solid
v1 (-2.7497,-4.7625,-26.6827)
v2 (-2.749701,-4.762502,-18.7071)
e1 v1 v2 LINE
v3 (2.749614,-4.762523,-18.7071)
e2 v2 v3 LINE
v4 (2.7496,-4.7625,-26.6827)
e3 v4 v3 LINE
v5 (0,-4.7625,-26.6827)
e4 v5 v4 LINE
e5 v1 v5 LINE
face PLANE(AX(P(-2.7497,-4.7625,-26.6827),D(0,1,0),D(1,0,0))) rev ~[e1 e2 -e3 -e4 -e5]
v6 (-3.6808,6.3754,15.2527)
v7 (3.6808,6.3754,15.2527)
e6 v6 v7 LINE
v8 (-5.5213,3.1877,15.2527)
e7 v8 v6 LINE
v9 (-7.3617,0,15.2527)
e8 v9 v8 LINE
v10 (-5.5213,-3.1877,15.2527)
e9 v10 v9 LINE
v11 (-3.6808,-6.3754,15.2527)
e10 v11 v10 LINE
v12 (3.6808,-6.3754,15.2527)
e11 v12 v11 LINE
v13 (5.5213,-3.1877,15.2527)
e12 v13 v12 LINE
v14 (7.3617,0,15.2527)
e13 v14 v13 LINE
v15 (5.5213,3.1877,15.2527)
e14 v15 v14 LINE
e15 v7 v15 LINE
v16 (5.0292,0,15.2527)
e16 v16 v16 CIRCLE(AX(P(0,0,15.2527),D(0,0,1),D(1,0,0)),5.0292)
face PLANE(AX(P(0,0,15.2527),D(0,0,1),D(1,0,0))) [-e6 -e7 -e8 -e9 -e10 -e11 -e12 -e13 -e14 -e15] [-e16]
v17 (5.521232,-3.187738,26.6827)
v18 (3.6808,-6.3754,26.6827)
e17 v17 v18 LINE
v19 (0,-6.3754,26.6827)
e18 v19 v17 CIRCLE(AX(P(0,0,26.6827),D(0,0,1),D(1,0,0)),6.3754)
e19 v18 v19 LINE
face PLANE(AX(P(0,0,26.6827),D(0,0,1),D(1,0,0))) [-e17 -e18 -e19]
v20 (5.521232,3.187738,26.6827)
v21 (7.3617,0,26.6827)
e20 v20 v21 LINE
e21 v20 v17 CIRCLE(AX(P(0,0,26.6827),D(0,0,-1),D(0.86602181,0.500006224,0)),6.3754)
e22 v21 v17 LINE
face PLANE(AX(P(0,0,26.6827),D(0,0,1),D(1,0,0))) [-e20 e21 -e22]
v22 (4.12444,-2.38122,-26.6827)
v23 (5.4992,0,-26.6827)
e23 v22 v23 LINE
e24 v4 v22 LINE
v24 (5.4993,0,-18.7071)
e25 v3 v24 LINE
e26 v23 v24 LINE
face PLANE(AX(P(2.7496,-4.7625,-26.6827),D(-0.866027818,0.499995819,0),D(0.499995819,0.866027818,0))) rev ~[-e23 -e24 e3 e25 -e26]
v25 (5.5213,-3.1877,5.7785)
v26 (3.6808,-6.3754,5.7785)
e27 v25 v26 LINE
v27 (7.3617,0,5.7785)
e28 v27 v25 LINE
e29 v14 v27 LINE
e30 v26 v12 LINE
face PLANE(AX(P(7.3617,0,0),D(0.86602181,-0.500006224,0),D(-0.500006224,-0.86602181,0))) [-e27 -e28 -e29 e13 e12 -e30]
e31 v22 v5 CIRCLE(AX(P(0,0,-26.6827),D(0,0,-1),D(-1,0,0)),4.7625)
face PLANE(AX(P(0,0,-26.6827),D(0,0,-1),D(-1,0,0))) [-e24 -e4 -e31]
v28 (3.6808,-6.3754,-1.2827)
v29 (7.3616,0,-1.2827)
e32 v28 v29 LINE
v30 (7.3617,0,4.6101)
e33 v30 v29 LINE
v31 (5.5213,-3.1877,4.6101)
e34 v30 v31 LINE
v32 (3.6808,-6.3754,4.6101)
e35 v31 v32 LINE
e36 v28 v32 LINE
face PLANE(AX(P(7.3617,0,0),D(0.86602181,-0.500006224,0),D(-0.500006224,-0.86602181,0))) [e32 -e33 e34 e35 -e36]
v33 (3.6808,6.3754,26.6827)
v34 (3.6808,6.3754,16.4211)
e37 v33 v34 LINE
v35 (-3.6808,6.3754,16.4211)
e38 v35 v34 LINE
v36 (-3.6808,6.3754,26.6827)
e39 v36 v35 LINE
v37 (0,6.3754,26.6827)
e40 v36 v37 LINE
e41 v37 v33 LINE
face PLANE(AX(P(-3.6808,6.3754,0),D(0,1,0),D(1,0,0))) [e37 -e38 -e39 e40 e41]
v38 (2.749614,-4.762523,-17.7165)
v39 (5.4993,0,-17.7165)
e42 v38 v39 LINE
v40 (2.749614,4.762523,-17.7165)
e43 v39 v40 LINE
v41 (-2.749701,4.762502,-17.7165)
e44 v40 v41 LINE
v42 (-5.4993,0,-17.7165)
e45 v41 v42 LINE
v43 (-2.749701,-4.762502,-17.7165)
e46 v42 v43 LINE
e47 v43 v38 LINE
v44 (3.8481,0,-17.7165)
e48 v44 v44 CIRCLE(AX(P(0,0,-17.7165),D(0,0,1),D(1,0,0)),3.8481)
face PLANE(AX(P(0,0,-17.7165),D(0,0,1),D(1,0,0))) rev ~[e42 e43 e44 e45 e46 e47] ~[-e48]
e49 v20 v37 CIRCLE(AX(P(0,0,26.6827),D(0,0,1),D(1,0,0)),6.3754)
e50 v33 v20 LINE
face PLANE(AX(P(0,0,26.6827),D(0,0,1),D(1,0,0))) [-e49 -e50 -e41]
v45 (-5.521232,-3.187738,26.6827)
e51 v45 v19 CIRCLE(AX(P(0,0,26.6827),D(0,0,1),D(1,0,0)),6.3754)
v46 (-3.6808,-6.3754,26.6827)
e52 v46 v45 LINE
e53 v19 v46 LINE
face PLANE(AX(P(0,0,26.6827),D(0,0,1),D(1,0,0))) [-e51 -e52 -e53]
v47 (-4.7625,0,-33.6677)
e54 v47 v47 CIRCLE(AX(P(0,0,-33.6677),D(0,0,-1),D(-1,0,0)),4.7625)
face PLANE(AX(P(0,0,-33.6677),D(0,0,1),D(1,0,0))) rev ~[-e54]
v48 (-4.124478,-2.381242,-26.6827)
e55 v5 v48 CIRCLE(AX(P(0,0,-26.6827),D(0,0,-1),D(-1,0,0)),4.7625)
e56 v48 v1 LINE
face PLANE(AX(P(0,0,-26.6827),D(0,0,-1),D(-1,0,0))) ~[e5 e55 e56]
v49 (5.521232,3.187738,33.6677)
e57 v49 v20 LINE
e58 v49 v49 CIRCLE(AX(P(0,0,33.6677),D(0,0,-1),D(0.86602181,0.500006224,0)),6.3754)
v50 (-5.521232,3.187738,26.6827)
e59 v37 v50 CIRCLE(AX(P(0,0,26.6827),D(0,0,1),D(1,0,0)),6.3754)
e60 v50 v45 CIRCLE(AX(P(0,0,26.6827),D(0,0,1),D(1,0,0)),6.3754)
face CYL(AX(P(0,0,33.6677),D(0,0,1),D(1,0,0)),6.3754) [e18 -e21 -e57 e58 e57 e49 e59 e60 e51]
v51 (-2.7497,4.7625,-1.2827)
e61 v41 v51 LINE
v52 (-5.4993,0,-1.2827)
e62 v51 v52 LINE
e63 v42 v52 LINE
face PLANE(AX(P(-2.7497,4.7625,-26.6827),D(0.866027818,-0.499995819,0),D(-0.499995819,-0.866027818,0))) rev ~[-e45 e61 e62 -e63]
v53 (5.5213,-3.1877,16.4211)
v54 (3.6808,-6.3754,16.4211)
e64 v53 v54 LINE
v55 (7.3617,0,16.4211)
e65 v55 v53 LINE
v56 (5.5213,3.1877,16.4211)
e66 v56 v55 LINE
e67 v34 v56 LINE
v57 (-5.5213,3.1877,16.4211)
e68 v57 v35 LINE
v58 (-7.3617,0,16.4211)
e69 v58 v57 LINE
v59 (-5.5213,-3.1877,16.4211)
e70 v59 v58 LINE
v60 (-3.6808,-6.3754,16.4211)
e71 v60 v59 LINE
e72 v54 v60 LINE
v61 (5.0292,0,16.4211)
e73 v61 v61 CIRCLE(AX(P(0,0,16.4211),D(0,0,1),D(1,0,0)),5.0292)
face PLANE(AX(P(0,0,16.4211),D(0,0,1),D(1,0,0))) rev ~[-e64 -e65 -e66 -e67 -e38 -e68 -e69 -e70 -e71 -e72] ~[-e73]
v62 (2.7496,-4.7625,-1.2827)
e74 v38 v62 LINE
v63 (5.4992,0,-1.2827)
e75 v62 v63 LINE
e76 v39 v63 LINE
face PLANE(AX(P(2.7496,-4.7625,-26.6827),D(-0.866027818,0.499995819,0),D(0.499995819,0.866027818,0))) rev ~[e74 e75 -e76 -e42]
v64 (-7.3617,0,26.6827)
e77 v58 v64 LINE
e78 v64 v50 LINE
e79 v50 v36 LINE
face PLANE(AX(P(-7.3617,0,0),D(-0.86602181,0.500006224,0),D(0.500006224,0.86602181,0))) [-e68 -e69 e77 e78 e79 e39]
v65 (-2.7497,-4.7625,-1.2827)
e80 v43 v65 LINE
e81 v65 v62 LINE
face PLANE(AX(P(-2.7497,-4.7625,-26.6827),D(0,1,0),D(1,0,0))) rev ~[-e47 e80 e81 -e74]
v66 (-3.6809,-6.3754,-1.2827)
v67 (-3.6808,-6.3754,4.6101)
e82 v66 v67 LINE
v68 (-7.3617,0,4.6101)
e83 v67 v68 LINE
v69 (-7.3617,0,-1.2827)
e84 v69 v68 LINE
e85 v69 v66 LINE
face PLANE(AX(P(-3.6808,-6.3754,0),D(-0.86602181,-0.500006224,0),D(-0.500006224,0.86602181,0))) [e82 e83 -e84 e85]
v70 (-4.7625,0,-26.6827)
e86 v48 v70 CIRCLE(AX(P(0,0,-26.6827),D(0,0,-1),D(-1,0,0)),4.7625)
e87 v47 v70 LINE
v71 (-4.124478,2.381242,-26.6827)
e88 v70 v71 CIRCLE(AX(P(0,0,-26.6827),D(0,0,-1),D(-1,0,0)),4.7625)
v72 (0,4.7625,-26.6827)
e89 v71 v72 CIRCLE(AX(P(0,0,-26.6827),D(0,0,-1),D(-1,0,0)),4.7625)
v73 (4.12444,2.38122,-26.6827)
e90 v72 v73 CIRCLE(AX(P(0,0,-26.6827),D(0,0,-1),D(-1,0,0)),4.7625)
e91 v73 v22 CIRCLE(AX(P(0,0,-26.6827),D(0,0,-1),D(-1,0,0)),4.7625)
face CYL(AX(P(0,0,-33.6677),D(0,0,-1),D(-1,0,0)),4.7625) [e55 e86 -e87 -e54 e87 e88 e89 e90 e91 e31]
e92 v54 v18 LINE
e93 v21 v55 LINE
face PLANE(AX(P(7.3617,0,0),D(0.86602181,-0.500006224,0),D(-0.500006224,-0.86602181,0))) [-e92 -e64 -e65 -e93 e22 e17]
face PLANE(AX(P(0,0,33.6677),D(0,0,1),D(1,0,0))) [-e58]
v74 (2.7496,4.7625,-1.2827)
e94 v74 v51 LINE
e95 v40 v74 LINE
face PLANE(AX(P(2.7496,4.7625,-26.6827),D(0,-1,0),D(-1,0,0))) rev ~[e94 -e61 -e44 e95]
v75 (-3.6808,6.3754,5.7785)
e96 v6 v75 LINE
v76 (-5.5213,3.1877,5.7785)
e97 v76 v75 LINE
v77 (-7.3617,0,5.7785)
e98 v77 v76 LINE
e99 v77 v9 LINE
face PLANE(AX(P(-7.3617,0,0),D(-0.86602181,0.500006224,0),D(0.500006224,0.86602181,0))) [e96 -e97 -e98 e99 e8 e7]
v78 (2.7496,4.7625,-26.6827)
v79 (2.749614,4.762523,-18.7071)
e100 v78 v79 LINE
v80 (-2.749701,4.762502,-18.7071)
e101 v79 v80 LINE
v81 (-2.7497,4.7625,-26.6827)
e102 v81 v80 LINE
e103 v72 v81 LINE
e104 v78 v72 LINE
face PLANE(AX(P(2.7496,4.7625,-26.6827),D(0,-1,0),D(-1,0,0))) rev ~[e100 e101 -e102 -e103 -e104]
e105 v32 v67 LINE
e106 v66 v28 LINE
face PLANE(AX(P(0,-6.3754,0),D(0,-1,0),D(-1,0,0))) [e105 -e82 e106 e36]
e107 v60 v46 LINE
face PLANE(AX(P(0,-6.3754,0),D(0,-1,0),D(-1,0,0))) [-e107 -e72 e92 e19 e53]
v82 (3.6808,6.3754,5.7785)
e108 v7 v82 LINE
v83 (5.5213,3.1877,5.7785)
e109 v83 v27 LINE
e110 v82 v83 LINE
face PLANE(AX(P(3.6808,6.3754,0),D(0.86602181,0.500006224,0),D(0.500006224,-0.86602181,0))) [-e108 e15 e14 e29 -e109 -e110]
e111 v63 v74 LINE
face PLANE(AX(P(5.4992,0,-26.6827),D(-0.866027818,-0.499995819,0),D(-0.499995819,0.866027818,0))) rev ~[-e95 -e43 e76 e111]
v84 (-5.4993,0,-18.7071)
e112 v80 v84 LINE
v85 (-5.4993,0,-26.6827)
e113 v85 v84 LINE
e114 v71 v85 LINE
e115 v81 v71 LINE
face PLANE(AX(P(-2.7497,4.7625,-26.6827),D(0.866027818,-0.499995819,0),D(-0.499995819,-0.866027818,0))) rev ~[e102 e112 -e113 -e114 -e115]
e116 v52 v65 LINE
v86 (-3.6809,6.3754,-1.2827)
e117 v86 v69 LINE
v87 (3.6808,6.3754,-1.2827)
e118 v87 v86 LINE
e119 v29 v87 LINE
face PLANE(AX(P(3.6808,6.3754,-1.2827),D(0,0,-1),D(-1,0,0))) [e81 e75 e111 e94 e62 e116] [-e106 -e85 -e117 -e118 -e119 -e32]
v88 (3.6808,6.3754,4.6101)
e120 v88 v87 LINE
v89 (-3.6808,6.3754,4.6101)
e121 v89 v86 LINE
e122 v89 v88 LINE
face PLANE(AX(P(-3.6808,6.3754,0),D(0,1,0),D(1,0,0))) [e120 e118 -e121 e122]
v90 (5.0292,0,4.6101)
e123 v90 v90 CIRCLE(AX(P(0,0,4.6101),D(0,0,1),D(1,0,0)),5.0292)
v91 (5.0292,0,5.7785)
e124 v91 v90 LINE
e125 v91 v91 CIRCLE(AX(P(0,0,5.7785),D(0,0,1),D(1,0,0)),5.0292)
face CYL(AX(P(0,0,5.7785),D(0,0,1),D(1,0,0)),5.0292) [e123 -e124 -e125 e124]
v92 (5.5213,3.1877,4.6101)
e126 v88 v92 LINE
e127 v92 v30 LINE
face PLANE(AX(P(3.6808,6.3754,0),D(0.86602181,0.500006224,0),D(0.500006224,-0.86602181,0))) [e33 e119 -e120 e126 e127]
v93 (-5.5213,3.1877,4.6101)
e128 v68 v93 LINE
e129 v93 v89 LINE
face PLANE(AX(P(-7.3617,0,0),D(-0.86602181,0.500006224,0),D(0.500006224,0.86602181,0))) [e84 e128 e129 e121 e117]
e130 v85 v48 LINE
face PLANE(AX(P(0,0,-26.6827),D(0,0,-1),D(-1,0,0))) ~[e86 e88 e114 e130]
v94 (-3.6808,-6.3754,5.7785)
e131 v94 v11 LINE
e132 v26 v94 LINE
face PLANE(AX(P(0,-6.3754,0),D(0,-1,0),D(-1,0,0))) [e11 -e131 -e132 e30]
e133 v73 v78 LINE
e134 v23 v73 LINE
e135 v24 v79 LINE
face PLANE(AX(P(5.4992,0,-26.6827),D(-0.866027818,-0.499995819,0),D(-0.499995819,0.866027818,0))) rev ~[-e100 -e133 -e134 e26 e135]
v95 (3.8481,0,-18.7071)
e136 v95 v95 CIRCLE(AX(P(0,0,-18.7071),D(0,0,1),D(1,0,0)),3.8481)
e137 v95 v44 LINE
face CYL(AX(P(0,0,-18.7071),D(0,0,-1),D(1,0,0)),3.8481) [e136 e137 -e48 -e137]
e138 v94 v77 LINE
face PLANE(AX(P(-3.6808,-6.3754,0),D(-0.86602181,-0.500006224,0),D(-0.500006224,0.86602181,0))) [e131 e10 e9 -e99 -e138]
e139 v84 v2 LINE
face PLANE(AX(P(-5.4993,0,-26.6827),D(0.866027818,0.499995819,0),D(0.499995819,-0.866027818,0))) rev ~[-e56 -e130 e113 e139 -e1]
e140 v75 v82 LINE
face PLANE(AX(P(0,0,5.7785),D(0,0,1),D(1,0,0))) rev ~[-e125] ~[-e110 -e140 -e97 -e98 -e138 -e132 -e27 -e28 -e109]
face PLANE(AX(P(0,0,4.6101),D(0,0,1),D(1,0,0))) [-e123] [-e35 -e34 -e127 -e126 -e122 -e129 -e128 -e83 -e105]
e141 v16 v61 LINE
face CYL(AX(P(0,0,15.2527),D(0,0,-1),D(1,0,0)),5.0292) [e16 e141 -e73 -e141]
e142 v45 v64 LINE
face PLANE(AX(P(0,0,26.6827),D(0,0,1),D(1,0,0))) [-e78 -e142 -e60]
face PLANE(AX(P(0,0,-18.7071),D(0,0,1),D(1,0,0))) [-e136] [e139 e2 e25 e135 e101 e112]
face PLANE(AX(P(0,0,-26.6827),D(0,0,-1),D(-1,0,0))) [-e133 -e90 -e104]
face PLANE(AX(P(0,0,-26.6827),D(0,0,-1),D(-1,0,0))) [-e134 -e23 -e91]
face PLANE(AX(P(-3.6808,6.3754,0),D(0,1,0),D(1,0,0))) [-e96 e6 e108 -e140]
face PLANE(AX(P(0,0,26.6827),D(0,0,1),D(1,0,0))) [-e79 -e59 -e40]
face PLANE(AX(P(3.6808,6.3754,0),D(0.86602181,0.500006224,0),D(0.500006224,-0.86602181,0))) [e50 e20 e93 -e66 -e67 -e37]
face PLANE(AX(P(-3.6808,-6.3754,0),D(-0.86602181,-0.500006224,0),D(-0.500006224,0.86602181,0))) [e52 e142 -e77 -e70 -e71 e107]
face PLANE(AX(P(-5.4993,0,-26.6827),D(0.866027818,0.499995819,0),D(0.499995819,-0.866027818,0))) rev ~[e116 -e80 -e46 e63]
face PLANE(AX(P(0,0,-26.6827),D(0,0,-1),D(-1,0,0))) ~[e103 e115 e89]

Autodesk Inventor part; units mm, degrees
sketch "Sketch1" plane through (0, 0, 0) normal (0, 0, 1) x (1, 0, 0)
  line L0 (-10.3063, 0) -> (10.3063, 0) projected
  line L1 (0, -8.9256) -> (0, 8.9256) projected
  line L2 (3.6808, 6.3754) -> (7.3617, 0)
  line L3 (7.3617, 0) -> (3.6808, -6.3754)
  line L4 (3.6808, -6.3754) -> (-3.6808, -6.3754)
  line L5 (-3.6808, -6.3754) -> (-7.3617, 0)
  line L6 (-7.3617, 0) -> (-3.6808, 6.3754)
  line L7 (-3.6808, 6.3754) -> (3.6808, 6.3754)
  point P0 (0, 0)
  point P1 (0, 0)
  point P2 (0, 6.3754)
  dimension "d0" = 12.7508
extrude "Base" add sketch "Sketch1" along normal mid plane 67.3354
sketch "Sketch2" plane through (0, 0, 33.6677) normal (0, 0, 1) x (1, 0, 0)
  line L0 (7.3617, 0) -> (3.6808, -6.3754) projected
  line L1 (3.6808, 6.3754) -> (7.3617, 0) projected
  line L2 (-3.6808, 6.3754) -> (3.6808, 6.3754) projected
  line L3 (-7.3617, 0) -> (-3.6808, 6.3754) projected
  line L4 (-3.6808, -6.3754) -> (-7.3617, 0) projected
  line L5 (3.6808, -6.3754) -> (-3.6808, -6.3754) projected
  circle A0 centre (0, 0) radius 6.3754
extrude "Bearing Fit" cut sketch "Sketch2" against normal blind 6.985 contours L0 A0 L1 | L0 L5 A0 | A0 L2 L1 | L5 L4 A0 | A0 L3 L2 | L4 L3 A0
mirror "Mirror1" about plane through (0, 0, 0) normal (0, 0, 1) of "Bearing Fit"
sketch "Sketch4" plane through (0, 0, -33.6677) normal (0, 0, -1) x (-1, 0, 0)
  circle A0 centre (0, 0) radius 6.3754 projected
  circle A1 centre (0, 0) radius 4.7625
  dimension "d7" = 9.525
extrude "Extrusion4" cut sketch "Sketch4" against normal up to surface (6.985 mm away)
sketch "Sketch5" plane through (3.6808, 6.3754, -26.6827) normal (0, 0, -1) x (-1, 0, 0)
  line L0 (7.3617, 0) -> (11.0425, -6.3754) projected
  line L1 (0, 0) -> (7.3617, 0) projected
  line L2 (-3.6808, -6.3754) -> (0, 0) projected
  line L3 (0, -12.7508) -> (-3.6808, -6.3754) projected
  line L4 (7.3617, -12.7508) -> (0, -12.7508) projected
  line L5 (11.0425, -6.3754) -> (7.3617, -12.7508) projected
  line L6 (6.4305, -1.6129) -> (9.1801, -6.3754)
  line L7 (9.1801, -6.3754) -> (6.4305, -11.1379)
  line L8 (6.4305, -11.1379) -> (0.9312, -11.1379)
  line L9 (0.9312, -11.1379) -> (-1.8184, -6.3754)
  line L10 (-1.8184, -6.3754) -> (0.9312, -1.6129)
  line L11 (0.9312, -1.6129) -> (6.4305, -1.6129)
  dimension "d10" = 9.525
extrude ".375 step down" cut sketch "Sketch5" against normal blind 25.4
ref_plane "Work Plane1" through (0, 0, 15.2527) normal (0, 0, 1) x (1, 0, 0)
sketch "Sketch6" plane through (0, 0, 15.2527) normal (0, 0, 1) x (1, 0, 0)
  line L0 (-3.6808, 6.3754) -> (0, 6.3754) projected
  line L1 (-5.5213, 3.1877) -> (-3.6808, 6.3754) projected
  line L2 (3.6808, 6.3754) -> (5.5213, 3.1877) projected
  line L3 (0, 6.3754) -> (3.6808, 6.3754) projected
  line L4 (5.5213, 3.1877) -> (7.3617, 0) projected
  line L5 (7.3617, 0) -> (5.5213, -3.1877) projected
  line L6 (5.5213, -3.1877) -> (3.6808, -6.3754) projected
  line L7 (0, -6.3754) -> (-3.6808, -6.3754) projected
  line L8 (-3.6808, -6.3754) -> (-5.5213, -3.1877) projected
  line L9 (3.6808, -6.3754) -> (0, -6.3754) projected
  line L10 (-7.3617, 0) -> (-5.5213, 3.1877) projected
  line L11 (-5.5213, -3.1877) -> (-7.3617, 0) projected
  circle A0 centre (0, 0) radius 5.0292
  point P0 (0, 0)
  dimension "d14" = 10.0584
extrude "Extrusion6" cut sketch "Sketch6" along normal blind 1.1684
ref_plane "Work Plane2" through (0, 0, 5.7785) normal (0, 0, 1) x (1, 0, 0)
sketch "Sketch7" plane through (0, 0, 5.7785) normal (0, 0, 1) x (1, 0, 0)
  line L0 (0, 6.3754) -> (3.6808, 6.3754) projected
  line L1 (3.6808, 6.3754) -> (5.5213, 3.1877) projected
  line L2 (5.5213, 3.1877) -> (7.3617, 0) projected
  line L3 (7.3617, 0) -> (5.5213, -3.1877) projected
  line L4 (5.5213, -3.1877) -> (3.6808, -6.3754) projected
  line L5 (3.6808, -6.3754) -> (0, -6.3754) projected
  line L6 (0, -6.3754) -> (-3.6808, -6.3754) projected
  line L7 (-3.6808, -6.3754) -> (-5.5213, -3.1877) projected
  line L8 (-7.3617, 0) -> (-5.5213, 3.1877) projected
  line L9 (-5.5213, 3.1877) -> (-3.6808, 6.3754) projected
  line L10 (-3.6808, 6.3754) -> (0, 6.3754) projected
  circle A0 centre (0, 0) radius 5.0292
  circle A1 centre (0, 0) radius 7.3617
  point P0 (0, 0)
  dimension "d18" = 10.0584
extrude "Extrusion7" cut sketch "Sketch7" against normal blind 1.1684
ref_plane "Work Plane3" through (0, 0, -18.7071) normal (0, 0, 1) x (1, 0, 0)
sketch "Sketch8" plane through (0, 0, -18.7071) normal (0, 0, 1) x (1, 0, 0)
  circle A0 centre (0, 0) radius 3.8481
  line L0 (-2.7496, 4.7625) -> (2.7496, 4.7625) projected
  line L1 (-5.4993, 0) -> (-2.7496, 4.7625) projected
  circle A1 centre (0, 0) radius 5.4993
  point P0 (0, 0)
  dimension "d22" = 7.6962
extrude "Extrusion8" cut sketch "Sketch8" along normal blind 0.9906
properties part number "shaft - step down No. 1 - 0.5 hex" material "Steel"
